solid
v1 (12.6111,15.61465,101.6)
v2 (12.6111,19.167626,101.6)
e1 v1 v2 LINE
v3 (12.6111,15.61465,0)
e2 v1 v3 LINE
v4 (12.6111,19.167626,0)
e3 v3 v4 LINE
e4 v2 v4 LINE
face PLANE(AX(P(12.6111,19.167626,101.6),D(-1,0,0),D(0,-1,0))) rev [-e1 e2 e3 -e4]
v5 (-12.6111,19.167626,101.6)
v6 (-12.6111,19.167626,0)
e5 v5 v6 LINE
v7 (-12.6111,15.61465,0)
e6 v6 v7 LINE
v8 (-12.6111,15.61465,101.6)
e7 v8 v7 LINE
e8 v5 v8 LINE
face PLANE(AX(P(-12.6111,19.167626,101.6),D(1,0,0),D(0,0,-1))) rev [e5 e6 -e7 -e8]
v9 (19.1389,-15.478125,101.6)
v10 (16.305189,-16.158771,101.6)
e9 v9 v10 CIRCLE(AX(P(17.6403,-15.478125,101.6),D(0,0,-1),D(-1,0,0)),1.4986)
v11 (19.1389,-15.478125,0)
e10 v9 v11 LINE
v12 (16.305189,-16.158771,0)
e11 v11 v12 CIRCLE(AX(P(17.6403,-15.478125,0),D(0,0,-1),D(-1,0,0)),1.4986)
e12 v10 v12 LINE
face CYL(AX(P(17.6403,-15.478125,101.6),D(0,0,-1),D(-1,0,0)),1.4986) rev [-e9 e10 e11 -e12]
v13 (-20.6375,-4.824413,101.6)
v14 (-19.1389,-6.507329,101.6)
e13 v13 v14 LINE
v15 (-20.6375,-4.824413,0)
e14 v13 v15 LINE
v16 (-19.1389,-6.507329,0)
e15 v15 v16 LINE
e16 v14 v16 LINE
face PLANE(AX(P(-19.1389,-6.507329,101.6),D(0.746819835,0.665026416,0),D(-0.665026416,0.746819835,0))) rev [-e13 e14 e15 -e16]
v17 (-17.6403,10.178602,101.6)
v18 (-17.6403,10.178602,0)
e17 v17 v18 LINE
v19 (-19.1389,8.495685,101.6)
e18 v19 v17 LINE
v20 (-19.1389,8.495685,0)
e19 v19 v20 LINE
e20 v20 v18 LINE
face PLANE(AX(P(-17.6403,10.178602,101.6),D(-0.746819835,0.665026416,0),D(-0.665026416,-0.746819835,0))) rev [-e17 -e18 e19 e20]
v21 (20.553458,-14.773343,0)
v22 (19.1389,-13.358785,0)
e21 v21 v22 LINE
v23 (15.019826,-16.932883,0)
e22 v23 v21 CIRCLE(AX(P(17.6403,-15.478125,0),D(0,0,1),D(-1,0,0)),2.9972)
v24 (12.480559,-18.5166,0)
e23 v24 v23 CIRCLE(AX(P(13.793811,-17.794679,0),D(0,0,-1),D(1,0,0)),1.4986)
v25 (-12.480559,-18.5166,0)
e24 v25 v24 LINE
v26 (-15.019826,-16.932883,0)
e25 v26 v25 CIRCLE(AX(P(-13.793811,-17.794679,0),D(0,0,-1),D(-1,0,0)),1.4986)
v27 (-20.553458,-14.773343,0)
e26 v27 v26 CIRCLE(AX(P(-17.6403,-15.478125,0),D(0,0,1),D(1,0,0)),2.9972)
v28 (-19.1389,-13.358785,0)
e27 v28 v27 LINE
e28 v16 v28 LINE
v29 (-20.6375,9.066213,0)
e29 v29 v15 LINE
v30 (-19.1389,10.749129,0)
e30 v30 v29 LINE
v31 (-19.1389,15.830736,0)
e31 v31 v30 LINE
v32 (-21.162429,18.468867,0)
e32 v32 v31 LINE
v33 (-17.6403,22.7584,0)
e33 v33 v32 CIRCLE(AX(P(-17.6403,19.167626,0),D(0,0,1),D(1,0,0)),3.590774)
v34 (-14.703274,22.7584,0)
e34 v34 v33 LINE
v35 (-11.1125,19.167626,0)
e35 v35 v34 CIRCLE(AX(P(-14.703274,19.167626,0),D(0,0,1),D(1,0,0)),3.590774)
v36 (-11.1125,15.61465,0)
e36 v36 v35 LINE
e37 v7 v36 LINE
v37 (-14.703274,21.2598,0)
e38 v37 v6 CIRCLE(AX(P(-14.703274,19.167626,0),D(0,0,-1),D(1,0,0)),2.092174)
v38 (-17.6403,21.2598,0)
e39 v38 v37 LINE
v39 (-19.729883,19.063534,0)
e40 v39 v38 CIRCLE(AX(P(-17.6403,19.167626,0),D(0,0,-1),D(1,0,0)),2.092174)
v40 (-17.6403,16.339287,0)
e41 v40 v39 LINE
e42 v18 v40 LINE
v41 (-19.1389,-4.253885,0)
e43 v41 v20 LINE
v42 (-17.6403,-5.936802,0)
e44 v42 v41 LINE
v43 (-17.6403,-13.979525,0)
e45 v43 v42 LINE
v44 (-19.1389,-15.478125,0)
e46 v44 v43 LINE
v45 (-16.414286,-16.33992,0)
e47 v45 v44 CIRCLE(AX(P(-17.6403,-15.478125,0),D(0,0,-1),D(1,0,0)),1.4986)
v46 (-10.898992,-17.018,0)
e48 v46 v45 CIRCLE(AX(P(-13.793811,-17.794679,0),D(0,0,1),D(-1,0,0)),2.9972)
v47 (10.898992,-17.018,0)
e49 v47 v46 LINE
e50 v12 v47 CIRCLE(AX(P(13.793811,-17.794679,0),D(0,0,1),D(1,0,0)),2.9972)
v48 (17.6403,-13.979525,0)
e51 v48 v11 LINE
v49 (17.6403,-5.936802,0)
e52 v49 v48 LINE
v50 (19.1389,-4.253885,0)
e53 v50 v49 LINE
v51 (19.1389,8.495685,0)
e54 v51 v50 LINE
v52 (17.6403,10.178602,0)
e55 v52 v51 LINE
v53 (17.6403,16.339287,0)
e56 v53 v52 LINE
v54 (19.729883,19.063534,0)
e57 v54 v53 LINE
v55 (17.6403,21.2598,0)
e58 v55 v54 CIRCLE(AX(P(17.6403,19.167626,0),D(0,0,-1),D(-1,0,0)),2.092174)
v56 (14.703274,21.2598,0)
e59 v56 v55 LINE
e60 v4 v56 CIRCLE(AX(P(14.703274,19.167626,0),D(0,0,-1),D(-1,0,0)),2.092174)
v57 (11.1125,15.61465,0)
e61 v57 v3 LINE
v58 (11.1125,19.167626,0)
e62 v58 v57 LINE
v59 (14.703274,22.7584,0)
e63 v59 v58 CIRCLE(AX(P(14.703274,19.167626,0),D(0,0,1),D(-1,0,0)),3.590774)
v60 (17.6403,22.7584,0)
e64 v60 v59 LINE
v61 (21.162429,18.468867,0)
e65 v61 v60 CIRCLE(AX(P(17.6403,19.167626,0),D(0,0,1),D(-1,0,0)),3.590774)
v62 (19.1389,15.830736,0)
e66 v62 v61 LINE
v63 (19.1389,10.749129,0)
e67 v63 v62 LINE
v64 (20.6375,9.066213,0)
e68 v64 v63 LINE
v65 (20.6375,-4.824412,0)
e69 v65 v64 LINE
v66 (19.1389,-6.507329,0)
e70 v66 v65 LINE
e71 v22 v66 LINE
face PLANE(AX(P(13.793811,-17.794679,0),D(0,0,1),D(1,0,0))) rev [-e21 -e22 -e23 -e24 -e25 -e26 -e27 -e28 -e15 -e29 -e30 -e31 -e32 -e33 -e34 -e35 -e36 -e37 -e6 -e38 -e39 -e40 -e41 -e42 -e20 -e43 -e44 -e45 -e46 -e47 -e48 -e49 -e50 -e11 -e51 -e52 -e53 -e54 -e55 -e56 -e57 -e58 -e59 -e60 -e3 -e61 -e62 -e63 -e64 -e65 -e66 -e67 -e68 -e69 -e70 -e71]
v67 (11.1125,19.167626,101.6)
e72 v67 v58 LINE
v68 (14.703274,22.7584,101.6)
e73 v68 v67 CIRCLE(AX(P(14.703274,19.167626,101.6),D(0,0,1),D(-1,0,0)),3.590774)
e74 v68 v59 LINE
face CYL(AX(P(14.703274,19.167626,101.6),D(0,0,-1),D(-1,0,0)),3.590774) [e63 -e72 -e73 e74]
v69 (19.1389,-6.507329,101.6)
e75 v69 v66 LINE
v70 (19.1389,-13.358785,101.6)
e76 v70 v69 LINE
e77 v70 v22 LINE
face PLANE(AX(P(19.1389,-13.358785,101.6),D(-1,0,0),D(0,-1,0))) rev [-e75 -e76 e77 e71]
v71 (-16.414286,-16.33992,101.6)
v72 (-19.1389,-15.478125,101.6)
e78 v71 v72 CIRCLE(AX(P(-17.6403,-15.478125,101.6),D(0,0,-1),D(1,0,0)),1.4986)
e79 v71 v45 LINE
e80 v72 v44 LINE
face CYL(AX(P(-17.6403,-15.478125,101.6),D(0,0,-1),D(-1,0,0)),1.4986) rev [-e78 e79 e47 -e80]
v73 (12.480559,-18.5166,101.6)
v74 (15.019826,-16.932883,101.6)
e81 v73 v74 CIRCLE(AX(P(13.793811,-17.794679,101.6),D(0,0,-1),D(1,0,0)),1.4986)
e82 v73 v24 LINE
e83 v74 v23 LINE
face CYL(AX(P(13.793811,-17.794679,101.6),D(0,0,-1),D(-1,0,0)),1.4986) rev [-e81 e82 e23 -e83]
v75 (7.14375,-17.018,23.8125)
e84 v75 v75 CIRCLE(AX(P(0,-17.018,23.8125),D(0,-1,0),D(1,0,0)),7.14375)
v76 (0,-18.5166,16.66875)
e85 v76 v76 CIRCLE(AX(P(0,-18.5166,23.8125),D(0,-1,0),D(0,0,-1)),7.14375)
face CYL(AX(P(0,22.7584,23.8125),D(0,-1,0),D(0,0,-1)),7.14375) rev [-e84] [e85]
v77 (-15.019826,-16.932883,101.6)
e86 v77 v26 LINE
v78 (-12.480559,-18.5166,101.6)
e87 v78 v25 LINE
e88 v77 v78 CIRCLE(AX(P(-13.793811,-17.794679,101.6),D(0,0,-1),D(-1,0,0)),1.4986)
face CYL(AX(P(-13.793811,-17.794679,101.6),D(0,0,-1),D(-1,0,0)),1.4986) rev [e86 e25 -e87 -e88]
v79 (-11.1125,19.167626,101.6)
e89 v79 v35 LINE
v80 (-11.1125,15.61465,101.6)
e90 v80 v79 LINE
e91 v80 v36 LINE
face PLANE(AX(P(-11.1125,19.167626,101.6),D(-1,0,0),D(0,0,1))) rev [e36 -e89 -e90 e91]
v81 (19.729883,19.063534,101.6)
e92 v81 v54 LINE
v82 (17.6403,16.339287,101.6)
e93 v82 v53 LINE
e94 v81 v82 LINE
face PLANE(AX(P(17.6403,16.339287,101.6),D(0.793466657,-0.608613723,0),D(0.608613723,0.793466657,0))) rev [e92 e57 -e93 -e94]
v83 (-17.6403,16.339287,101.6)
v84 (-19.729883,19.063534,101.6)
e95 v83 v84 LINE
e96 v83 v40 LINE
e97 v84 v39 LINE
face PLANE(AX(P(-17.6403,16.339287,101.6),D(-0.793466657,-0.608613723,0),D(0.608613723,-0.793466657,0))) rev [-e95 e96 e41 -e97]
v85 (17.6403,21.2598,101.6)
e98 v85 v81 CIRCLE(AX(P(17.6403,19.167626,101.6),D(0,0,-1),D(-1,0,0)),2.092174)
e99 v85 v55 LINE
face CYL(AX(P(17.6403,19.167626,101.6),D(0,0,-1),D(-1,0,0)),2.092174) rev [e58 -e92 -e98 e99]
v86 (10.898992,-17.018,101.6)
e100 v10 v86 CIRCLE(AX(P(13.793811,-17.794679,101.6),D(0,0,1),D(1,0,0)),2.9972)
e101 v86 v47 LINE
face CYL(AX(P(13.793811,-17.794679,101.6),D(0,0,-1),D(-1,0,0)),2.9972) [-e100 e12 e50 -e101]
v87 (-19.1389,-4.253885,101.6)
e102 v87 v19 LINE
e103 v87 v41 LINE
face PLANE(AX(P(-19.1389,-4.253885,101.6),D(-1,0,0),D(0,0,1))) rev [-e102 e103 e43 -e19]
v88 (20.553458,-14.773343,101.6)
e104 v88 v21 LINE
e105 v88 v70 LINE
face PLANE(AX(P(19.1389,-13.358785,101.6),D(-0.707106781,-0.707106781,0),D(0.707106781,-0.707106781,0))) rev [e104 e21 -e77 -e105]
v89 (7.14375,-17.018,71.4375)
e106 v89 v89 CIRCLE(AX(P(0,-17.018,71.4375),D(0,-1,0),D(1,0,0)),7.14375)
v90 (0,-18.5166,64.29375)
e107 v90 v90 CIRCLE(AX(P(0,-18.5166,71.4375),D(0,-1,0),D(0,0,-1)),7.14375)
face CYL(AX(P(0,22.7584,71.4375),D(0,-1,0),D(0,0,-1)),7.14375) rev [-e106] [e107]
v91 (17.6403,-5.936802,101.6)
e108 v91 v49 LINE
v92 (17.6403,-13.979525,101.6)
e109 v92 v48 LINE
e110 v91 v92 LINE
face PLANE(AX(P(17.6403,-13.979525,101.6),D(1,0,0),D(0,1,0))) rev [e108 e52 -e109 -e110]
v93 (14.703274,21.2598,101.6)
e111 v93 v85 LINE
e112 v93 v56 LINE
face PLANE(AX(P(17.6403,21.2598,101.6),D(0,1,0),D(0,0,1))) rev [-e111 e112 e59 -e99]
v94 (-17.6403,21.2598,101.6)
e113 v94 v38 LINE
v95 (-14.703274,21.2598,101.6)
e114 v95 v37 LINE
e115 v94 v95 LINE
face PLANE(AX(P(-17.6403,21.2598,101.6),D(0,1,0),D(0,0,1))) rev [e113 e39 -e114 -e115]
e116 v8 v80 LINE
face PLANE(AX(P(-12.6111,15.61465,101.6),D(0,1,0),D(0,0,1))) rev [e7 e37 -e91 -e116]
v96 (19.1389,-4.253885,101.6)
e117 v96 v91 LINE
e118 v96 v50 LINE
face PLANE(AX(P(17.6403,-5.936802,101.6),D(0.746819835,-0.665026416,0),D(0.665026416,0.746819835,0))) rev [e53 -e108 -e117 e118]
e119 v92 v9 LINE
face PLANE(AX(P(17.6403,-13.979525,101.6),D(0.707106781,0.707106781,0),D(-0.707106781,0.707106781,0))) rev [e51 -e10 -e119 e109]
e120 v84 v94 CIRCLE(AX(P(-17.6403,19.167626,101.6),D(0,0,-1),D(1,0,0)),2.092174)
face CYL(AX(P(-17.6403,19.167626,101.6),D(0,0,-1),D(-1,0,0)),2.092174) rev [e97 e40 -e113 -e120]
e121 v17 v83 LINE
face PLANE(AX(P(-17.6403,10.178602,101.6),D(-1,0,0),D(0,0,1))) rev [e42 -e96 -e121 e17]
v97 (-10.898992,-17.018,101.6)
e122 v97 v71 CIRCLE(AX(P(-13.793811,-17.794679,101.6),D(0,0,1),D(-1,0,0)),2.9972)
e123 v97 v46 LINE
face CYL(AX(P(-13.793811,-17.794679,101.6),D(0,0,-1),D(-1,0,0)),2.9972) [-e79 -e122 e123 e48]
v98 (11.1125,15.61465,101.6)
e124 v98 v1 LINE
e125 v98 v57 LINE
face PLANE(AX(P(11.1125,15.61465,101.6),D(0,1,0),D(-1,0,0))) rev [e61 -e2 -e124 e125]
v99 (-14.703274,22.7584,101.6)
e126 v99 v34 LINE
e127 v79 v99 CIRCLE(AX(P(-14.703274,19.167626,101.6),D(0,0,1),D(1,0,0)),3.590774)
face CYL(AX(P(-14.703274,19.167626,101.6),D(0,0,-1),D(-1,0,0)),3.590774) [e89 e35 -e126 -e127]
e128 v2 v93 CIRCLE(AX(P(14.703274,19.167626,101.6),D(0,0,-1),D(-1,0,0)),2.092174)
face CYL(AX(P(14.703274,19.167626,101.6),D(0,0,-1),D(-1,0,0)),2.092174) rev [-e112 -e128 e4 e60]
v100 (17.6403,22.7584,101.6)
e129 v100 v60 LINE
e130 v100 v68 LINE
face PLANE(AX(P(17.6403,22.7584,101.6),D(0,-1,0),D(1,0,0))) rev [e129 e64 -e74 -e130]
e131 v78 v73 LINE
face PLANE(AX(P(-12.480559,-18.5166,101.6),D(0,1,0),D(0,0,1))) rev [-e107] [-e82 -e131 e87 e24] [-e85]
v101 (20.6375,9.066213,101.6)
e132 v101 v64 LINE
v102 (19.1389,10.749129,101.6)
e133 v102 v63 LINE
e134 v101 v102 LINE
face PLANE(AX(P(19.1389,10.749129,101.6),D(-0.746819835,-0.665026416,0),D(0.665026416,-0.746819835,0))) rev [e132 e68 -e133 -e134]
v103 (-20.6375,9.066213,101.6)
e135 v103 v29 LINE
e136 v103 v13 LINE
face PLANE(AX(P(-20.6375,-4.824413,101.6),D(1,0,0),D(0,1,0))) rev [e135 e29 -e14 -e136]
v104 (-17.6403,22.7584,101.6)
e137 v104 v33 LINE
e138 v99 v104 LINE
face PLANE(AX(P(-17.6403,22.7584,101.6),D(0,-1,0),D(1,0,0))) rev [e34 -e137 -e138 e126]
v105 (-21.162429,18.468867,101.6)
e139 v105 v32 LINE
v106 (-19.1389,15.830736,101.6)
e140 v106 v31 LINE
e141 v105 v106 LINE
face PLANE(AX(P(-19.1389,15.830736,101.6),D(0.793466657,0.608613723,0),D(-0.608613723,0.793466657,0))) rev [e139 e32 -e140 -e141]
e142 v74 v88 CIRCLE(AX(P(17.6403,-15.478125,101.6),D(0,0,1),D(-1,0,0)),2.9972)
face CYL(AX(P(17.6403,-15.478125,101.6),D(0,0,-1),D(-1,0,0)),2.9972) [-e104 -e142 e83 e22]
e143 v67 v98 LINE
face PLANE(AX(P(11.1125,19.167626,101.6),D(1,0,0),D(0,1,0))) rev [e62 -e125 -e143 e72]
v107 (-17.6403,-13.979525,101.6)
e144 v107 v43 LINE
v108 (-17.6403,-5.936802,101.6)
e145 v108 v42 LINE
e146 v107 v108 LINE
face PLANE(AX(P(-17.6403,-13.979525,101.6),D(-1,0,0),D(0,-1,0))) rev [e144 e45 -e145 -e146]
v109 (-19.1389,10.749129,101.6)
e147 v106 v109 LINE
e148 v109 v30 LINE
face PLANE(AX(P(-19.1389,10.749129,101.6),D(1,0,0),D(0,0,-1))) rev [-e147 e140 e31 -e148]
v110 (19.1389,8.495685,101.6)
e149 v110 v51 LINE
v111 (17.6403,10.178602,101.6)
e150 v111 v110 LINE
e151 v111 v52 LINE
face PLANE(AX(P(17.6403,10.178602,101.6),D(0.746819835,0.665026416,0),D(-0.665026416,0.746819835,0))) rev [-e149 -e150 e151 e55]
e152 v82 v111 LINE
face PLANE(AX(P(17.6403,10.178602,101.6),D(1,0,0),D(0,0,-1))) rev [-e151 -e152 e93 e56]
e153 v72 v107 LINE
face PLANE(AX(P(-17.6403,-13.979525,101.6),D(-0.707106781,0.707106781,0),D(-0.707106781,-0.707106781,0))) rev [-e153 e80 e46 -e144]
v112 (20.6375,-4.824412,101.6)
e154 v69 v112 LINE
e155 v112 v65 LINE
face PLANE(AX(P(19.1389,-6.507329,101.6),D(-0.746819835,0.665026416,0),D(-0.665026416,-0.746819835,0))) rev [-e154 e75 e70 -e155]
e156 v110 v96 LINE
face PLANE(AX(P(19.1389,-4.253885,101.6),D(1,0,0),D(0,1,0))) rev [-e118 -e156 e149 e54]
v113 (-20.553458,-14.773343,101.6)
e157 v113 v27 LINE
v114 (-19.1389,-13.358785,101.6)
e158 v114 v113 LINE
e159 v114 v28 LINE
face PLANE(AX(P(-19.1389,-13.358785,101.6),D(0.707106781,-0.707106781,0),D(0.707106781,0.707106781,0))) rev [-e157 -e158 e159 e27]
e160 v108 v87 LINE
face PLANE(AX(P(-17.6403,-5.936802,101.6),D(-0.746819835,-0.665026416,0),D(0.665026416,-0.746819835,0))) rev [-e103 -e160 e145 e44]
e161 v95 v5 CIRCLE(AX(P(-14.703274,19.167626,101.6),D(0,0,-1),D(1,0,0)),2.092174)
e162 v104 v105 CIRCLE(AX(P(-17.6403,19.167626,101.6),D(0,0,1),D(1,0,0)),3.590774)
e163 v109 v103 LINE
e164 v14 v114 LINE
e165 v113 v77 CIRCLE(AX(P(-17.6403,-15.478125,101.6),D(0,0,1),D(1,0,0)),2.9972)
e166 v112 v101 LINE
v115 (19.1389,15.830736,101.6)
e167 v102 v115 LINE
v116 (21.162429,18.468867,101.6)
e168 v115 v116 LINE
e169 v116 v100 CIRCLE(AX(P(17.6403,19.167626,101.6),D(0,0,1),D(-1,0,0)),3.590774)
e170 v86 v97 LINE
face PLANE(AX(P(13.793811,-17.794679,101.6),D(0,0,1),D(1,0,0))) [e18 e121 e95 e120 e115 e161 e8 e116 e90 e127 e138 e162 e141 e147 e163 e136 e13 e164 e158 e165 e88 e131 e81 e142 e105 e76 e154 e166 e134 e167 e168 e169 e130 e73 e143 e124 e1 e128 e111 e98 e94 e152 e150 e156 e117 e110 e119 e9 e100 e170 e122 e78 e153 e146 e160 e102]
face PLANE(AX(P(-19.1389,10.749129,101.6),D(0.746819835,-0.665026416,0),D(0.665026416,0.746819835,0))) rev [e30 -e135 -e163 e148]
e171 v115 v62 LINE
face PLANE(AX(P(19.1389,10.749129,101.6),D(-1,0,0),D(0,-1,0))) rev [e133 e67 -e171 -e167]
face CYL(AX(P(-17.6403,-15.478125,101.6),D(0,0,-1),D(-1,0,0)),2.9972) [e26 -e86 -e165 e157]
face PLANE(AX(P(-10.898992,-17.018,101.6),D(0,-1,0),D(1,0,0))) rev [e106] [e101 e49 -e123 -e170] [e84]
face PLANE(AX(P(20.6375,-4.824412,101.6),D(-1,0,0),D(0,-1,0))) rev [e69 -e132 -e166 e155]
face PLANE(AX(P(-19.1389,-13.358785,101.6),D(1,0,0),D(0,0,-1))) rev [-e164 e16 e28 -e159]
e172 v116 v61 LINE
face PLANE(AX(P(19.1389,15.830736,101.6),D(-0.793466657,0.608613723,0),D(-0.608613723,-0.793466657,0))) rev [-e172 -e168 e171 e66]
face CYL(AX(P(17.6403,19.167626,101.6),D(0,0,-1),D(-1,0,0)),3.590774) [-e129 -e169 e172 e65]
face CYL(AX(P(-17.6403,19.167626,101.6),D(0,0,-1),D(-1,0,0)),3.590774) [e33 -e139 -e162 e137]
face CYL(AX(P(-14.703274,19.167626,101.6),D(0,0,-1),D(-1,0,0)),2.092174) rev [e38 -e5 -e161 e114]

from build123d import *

# Parameters (mm, degrees)
BASE_EXTRUDE_DEPTH = 101.6
HOLE1_START        = -18.5166
HOLE1_OUTLINE_R    = 7.14375
HOLE1_DEPTH        = 1.4986
LPATTERN2_COUNT    = 2
LPATTERN2_PITCH    = 47.625


# Read off the part's stored shape, not the designer's step: Hole1
with BuildPart() as part:
    # Sketch1 → Base-Extrude (new body)
    with BuildSketch(Plane.XY):
        with BuildLine():
            Line((17.6403, 16.339286512), (19.729882578, 19.063533504))
            ThreePointArc((19.729882578, 19.063533504), (19.156045845, 20.609744632), (17.6403, 21.2598))
            Line((17.6403, 21.2598), (14.70327367, 21.2598))
            ThreePointArc((14.70327367, 21.2598), (13.223883481, 20.647016519), (12.6111, 19.16762633))
            Line((12.6111, 19.16762633), (12.6111, 15.61465))
            Line((12.6111, 15.61465), (11.1125, 15.61465))
            Line((11.1125, 15.61465), (11.1125, 19.16762633))
            ThreePointArc((11.1125, 19.16762633), (12.164213258, 21.706686742), (14.70327367, 22.7584))
            Line((14.70327367, 22.7584), (17.6403, 22.7584))
            ThreePointArc((17.6403, 22.7584), (20.415434554, 21.446284653), (21.162428673, 18.4688666))
            Line((21.162428673, 18.4688666), (19.1389, 15.830735923))
            Line((19.1389, 15.830735923), (19.1389, 10.749129415))
            Line((19.1389, 10.749129415), (20.6375, 9.0662125))
            Line((20.6375, 9.0662125), (20.6375, -4.8244125))
            Line((20.6375, -4.8244125), (19.1389, -6.507329415))
            Line((19.1389, -6.507329415), (19.1389, -13.358784555))
            Line((19.1389, -13.358784555), (20.553458003, -14.773342558))
            ThreePointArc((20.553458003, -14.773342558), (18.729942105, -18.270236732), (15.019825564, -16.932883251))
            ThreePointArc((15.019825564, -16.932883251), (13.000752562, -16.523120627), (12.480559153, -18.5166))
            Line((12.480559153, -18.5166), (-12.480559153, -18.5166))
            ThreePointArc((-12.480559153, -18.5166), (-13.000752562, -16.523120627), (-15.019825564, -16.932883251))
            ThreePointArc((-15.019825564, -16.932883251), (-18.729942105, -18.270236732), (-20.553458003, -14.773342558))
            Line((-20.553458003, -14.773342558), (-19.1389, -13.358784555))
            Line((-19.1389, -13.358784555), (-19.1389, -6.507329415))
            Line((-19.1389, -6.507329415), (-20.6375, -4.8244125))
            Line((-20.6375, -4.8244125), (-20.6375, 9.0662125))
            Line((-20.6375, 9.0662125), (-19.1389, 10.749129415))
            Line((-19.1389, 10.749129415), (-19.1389, 15.830735923))
            Line((-19.1389, 15.830735923), (-21.162428673, 18.4688666))
            ThreePointArc((-21.162428673, 18.4688666), (-20.415434554, 21.446284653), (-17.6403, 22.7584))
            Line((-17.6403, 22.7584), (-14.70327367, 22.7584))
            ThreePointArc((-14.70327367, 22.7584), (-12.164213258, 21.706686742), (-11.1125, 19.16762633))
            Line((-11.1125, 19.16762633), (-11.1125, 15.61465))
            Line((-11.1125, 15.61465), (-12.6111, 15.61465))
            Line((-12.6111, 15.61465), (-12.6111, 19.16762633))
            ThreePointArc((-12.6111, 19.16762633), (-13.223883481, 20.647016519), (-14.70327367, 21.2598))
            Line((-14.70327367, 21.2598), (-17.6403, 21.2598))
            ThreePointArc((-17.6403, 21.2598), (-19.156045845, 20.609744632), (-19.729882578, 19.063533504))
            Line((-19.729882578, 19.063533504), (-17.6403, 16.339286512))
            Line((-17.6403, 16.339286512), (-17.6403, 10.17860201))
            Line((-17.6403, 10.17860201), (-19.1389, 8.495685095))
            Line((-19.1389, 8.495685095), (-19.1389, -4.253885095))
            Line((-19.1389, -4.253885095), (-17.6403, -5.93680201))
            Line((-17.6403, -5.93680201), (-17.6403, -13.979525))
            Line((-17.6403, -13.979525), (-19.1389, -15.478125))
            ThreePointArc((-19.1389, -15.478125), (-18.092238669, -16.906954381), (-16.414285827, -16.33992034))
            ThreePointArc((-16.414285827, -16.33992034), (-13.428073412, -14.819877156), (-10.898992189, -17.018))
            Line((-10.898992189, -17.018), (10.898992189, -17.018))
            ThreePointArc((10.898992189, -17.018), (13.323359075, -14.834630878), (16.30518861, -16.15877141))
            ThreePointArc((16.30518861, -16.15877141), (17.990302879, -16.935279743), (19.1389, -15.478125))
            Line((19.1389, -15.478125), (17.6403, -13.979525))
            Line((17.6403, -13.979525), (17.6403, -5.93680201))
            Line((17.6403, -5.93680201), (19.1389, -4.253885095))
            Line((19.1389, -4.253885095), (19.1389, 8.495685095))
            Line((19.1389, 8.495685095), (17.6403, 10.17860201))
            Line((17.6403, 10.17860201), (17.6403, 16.339286512))
        make_face()
    extrude(amount=BASE_EXTRUDE_DEPTH)

    # Hole1 outline → Hole1 (cut)
    with BuildSketch(Plane(origin=(0, 0, 0), x_dir=(1, 0, 0), z_dir=(0, 1, 0)).offset(HOLE1_START)):
        with Locations((0, -23.8125)):
            Circle(HOLE1_OUTLINE_R)
    hole1 = extrude(amount=HOLE1_DEPTH, mode=Mode.SUBTRACT)

    # LPattern2: Hole1 ×2
    with Locations(*[(0, 0, i * LPATTERN2_PITCH) for i in range(1, LPATTERN2_COUNT)]):
        add(hole1, mode=Mode.SUBTRACT)


solid = part.part
